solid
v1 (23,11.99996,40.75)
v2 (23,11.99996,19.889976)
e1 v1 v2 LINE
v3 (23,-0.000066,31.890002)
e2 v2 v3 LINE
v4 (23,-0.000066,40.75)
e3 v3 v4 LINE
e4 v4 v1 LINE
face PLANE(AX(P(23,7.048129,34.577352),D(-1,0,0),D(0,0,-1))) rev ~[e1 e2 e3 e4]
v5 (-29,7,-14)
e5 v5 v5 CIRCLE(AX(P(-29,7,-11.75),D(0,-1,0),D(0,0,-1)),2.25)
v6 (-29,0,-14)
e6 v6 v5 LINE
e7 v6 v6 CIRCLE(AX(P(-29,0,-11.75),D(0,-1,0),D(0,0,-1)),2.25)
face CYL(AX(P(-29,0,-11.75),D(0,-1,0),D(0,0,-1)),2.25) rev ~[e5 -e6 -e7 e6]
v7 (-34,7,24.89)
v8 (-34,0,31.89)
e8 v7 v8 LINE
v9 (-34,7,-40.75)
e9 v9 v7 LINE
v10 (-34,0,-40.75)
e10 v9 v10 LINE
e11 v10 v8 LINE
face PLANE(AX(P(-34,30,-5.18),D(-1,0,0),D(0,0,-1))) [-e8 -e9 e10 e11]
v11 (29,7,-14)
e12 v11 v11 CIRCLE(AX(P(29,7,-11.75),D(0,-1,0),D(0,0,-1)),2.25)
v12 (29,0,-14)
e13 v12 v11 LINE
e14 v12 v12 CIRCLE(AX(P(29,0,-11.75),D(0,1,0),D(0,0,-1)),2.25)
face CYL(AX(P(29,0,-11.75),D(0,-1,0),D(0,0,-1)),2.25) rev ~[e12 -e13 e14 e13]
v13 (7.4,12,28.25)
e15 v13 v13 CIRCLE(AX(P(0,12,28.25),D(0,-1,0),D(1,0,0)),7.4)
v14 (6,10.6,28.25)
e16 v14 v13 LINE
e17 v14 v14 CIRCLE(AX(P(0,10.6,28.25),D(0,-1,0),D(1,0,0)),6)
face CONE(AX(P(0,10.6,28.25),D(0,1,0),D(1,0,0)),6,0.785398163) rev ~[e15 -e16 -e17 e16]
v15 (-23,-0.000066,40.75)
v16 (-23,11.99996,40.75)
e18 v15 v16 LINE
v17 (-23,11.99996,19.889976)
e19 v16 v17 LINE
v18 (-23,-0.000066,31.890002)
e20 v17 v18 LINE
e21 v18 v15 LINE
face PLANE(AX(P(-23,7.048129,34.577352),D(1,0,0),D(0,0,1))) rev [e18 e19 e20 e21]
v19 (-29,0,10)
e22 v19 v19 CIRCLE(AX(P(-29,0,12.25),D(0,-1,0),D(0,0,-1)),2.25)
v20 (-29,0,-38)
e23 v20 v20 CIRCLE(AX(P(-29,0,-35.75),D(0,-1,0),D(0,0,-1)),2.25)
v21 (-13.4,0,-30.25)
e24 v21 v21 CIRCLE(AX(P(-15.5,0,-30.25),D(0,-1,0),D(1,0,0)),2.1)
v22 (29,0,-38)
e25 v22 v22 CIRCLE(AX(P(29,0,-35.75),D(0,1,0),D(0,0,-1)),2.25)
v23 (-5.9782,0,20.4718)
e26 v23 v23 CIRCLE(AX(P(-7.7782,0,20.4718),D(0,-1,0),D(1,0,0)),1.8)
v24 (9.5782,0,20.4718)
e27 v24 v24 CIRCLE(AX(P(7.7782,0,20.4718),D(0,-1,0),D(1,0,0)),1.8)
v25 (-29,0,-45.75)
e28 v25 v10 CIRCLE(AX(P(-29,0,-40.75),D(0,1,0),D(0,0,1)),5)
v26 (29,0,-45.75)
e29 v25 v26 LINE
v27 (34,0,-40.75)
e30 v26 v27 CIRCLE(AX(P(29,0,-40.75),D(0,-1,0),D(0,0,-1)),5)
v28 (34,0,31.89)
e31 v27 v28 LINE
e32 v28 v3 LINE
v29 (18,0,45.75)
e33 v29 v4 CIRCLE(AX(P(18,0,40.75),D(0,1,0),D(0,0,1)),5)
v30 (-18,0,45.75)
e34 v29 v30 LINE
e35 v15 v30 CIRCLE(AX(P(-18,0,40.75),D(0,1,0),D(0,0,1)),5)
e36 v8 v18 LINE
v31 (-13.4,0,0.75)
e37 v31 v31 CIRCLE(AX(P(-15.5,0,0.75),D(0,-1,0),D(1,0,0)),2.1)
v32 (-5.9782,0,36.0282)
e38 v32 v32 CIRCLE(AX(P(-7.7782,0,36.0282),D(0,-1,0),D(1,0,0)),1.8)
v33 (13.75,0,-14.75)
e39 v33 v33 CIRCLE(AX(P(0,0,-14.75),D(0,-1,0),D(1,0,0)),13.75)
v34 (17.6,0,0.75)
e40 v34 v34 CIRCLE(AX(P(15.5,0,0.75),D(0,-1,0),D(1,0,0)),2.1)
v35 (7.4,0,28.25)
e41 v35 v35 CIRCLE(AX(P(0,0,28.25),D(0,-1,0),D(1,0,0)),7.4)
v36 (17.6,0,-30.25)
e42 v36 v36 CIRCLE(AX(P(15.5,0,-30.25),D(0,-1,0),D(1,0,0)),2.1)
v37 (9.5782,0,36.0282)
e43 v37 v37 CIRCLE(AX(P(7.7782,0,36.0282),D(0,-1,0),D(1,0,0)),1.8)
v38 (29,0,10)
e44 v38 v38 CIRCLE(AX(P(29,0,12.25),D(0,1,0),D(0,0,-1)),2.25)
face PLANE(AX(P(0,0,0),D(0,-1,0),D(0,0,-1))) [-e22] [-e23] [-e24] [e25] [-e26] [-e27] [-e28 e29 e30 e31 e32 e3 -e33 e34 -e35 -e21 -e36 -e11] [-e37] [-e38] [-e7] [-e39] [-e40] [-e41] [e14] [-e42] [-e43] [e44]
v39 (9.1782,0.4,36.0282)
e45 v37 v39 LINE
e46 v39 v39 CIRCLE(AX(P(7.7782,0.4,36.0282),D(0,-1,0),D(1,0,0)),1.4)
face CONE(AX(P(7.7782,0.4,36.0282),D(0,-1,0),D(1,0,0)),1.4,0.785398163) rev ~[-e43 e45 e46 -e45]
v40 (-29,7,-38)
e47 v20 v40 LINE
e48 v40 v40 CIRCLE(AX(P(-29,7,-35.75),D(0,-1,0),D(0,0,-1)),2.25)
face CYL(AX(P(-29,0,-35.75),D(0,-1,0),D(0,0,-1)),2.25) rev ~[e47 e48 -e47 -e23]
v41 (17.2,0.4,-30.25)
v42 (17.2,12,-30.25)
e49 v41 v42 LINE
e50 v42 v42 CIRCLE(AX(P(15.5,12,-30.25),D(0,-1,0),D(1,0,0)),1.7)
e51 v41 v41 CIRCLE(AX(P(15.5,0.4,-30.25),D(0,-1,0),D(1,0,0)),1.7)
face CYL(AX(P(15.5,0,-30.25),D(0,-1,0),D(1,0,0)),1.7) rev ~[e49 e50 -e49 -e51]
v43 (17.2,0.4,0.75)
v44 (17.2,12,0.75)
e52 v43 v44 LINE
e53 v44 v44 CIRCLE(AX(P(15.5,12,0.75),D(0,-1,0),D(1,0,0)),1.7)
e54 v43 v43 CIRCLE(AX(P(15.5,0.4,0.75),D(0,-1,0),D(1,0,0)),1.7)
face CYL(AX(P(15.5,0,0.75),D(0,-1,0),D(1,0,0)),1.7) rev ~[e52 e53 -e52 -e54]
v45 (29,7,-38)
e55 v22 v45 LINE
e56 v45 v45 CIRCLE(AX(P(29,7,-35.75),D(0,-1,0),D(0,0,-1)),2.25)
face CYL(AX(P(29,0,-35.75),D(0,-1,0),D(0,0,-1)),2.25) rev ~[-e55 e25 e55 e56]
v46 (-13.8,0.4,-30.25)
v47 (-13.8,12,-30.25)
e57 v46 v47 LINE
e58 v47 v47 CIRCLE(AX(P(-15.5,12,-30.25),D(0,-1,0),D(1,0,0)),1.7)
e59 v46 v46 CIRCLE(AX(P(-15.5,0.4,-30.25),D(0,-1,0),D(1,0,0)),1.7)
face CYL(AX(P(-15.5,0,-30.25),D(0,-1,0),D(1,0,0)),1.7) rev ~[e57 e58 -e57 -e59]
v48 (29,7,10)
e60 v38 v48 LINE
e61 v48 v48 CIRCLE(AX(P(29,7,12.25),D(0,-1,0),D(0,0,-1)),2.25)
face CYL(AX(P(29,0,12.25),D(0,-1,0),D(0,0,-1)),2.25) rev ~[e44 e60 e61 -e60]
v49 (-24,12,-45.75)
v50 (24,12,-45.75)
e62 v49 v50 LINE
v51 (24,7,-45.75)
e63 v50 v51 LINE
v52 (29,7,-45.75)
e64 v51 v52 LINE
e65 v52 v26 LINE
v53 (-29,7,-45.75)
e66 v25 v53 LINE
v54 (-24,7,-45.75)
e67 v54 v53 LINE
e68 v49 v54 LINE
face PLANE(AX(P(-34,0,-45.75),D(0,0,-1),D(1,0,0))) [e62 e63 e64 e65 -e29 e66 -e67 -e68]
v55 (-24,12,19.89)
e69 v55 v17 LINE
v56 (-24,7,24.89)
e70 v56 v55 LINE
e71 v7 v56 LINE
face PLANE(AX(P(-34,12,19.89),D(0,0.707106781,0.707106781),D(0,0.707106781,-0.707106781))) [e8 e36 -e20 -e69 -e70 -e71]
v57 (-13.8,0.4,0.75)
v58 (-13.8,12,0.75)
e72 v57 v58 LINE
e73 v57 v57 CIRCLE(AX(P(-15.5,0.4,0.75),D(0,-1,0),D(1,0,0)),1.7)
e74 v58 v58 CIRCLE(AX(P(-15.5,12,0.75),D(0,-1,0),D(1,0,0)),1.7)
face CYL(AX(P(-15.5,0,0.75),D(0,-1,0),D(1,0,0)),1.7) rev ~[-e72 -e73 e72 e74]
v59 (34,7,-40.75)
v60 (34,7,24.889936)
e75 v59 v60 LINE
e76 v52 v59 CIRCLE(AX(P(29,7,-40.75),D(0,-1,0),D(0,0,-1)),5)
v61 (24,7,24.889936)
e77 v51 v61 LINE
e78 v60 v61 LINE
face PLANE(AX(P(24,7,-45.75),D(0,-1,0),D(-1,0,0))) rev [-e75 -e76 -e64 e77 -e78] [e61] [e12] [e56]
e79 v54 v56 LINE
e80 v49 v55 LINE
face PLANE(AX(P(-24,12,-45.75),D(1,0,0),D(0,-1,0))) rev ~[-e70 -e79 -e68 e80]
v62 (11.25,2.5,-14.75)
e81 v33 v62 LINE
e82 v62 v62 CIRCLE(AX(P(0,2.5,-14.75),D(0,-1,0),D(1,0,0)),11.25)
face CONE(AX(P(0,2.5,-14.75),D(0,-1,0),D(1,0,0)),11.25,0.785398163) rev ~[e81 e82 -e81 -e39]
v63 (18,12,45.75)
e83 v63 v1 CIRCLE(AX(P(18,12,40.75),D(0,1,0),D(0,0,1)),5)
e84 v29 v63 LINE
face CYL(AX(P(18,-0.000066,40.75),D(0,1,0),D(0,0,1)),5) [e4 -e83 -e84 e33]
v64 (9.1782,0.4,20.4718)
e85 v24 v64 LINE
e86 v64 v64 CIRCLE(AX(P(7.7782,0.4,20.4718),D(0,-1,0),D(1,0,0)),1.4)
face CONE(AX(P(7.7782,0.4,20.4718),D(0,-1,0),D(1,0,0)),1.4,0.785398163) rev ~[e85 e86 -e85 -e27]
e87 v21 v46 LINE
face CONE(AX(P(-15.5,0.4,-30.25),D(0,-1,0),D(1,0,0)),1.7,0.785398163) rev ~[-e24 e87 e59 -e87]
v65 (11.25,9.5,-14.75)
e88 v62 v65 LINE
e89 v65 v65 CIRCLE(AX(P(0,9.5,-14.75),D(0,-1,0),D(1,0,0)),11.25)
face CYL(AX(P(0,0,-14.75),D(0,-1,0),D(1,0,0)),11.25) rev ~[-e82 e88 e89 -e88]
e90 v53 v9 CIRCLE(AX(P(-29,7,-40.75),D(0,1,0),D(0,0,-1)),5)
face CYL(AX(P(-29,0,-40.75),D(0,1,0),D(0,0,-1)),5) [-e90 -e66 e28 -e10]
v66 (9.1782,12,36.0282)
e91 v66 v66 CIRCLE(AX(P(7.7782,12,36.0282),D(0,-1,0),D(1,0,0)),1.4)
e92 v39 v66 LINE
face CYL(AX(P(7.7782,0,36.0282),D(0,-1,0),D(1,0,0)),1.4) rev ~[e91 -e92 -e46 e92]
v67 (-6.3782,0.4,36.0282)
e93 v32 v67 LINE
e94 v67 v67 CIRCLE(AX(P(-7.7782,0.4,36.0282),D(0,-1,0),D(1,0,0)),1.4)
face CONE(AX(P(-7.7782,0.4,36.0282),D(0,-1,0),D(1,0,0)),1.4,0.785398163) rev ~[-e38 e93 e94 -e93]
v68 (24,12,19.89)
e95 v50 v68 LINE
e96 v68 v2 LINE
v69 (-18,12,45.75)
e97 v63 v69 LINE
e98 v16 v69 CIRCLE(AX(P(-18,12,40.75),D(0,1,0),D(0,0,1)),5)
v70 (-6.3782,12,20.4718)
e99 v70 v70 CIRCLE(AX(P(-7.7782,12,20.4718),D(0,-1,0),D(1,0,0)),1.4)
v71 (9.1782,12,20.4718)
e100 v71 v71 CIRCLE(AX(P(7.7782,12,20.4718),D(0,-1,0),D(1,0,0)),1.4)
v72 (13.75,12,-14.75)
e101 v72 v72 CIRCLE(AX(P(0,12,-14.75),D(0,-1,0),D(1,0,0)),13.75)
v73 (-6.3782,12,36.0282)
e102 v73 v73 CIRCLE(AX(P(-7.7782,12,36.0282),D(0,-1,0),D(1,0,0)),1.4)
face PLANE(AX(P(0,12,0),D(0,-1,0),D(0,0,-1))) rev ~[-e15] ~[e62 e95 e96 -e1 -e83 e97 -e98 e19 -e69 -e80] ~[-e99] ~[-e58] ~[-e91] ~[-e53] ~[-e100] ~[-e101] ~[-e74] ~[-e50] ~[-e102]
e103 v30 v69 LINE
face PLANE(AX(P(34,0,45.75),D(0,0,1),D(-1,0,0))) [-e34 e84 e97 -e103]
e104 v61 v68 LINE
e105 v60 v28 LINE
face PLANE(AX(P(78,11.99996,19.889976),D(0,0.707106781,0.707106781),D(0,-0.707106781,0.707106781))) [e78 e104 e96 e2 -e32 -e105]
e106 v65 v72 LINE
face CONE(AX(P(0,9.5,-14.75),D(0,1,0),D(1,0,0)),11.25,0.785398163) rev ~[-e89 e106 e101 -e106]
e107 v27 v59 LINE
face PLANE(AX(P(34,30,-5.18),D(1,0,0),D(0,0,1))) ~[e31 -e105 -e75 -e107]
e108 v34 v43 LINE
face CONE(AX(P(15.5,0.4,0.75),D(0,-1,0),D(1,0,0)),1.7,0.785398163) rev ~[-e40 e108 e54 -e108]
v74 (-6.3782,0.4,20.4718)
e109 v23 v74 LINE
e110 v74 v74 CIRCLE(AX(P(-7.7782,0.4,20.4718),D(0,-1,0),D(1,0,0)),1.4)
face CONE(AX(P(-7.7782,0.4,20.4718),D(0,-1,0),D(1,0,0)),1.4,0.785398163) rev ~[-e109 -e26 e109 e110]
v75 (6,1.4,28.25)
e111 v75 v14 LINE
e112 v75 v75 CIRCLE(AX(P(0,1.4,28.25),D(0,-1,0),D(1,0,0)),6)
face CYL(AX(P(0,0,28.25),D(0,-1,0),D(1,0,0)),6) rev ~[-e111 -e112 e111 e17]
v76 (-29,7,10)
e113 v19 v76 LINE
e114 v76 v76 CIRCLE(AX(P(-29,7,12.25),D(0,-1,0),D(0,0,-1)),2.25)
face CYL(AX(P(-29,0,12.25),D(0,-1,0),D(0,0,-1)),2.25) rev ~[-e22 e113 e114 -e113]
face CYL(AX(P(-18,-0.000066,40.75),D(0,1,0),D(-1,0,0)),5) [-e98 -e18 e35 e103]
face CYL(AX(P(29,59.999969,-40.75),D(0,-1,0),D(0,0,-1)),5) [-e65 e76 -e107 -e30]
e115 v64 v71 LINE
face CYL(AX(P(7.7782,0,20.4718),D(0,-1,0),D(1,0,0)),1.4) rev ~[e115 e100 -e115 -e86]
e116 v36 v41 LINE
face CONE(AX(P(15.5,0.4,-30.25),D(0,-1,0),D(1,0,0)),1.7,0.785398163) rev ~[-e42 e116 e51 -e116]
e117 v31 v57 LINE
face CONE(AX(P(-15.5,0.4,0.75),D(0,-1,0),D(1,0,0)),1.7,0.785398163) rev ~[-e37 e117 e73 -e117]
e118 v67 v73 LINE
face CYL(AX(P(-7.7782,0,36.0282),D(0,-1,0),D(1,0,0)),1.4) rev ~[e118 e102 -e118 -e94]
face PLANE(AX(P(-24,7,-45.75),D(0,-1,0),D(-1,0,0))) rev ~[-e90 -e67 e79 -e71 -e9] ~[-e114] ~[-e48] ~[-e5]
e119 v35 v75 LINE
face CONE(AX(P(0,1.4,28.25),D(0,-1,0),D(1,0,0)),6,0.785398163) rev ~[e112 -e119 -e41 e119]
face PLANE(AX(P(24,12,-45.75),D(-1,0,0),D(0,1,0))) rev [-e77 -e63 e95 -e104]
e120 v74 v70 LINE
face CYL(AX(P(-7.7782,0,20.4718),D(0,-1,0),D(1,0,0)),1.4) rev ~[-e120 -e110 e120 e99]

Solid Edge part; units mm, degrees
sketch "Sketch1" plane through (0, 0, 0) normal (0, -1, 0) x (1, 0, 0)
  line L0 (-34, -45.75) -> (34, -45.75)
  line L1 (34, -45.75) -> (34, 45.75)
  line L2 (34, 45.75) -> (-34, 45.75)
  line L3 (-34, 45.75) -> (-34, -45.75)
  dimension "D1" = 68
  dimension "D2" = 91.5
extrude "Protrusion1" add sketch "Sketch1" against normal blind 12
sketch "Sketch2" plane through (0, 0, 0) normal (0, -1, 0) x (1, 0, 0)
  circle A0 centre (0, -14.75) radius 11.25
  circle A1 centre (-15.5, 0.75) radius 1.7
  circle A2 centre (-15.5, -30.25) radius 1.7
  circle A3 centre (15.5, -30.25) radius 1.7
  circle A4 centre (15.5, 0.75) radius 1.7
  dimension "D1" = 22.5
  dimension "D2" = 3.4
  dimension "D3" = 31
  dimension "D4" = 31
extrude "Cutout1" cut sketch "Sketch2" against normal through all
sketch "Sketch3" plane through (0, 0, 0) normal (0, -1, 0) x (1, 0, 0)
  circle A0 centre (7.7782, 36.0282) radius 1.4
  circle A1 centre (7.7782, 20.4718) radius 1.4
  circle A2 centre (-7.7782, 20.4718) radius 1.4
  circle A3 centre (-7.7782, 36.0282) radius 1.4
  circle A4 centre (0, 28.25) radius 6
  dimension "D1" = 7.7782
extrude "Cutout2" cut sketch "Sketch3" against normal through all
sketch "Sketch4" plane through (-34, 6, 0) normal (-1, 0, 0) x (0, 0, -1)
  line L0 (-19.89, -6) -> (45.75, -71.64)
  line L1 (45.75, -71.64) -> (45.75, -6)
  line L2 (45.75, -6) -> (-19.89, -6)
  dimension "D1" = 25.86
extrude "Extrusionsausprägung_2" add sketch "Sketch4" against normal blind 10
mirror "Mirror1" about plane through (0, 0, 0) normal (1, 0, 0) of "Extrusionsausprägung_2"
sketch "Sketch5" plane through (-34, 38.82, 0) normal (-1, 0, 0) x (0, 0, -1)
  circle A0 centre (33.7465, 1.4635) radius 1.875
  circle A1 centre (19.6043, 15.6057) radius 1.875
  dimension "D1" = 3.75
  dimension "D2" = 20
  dimension "D3" = 42.14
  dimension "D4" = 32.83
extrude "Extrusionsausschnitt_3" cut sketch "Sketch5" against normal blind 14
sketch "Sketch6" plane through (-34, 38.82, 0) normal (-1, 0, 0) x (0, 0, -1)
  line L0 (45.75, -38.82) -> (-31.89, 38.82)
  line L1 (-31.89, 38.82) -> (-17.75, 38.82)
  line L2 (-17.75, 38.82) -> (45.75, -24.68)
  line L3 (45.75, -24.68) -> (45.75, -38.82)
  dimension "D1" = 14.14
extrude "Extrusionsausprägung_4" add sketch "Sketch6" along normal blind 44
mirror "Mirror2" about plane through (0, 0, 0) normal (1, 0, 0) of "Extrusionsausprägung_4"
sketch "Sketch7" plane through (-54, 31.75, -14) normal (0, -0.7071068, -0.7071068) x (1, 0, 0)
  circle A0 centre (-14, 10.2613) radius 4
  circle A1 centre (-14, -19.7387) radius 4
  dimension "D1" = 8
  dimension "D2" = 34.64
  dimension "D3" = 30
  dimension "D4" = 10
extrude "Cutout3" cut sketch "Sketch7" against normal up to next
mirror "Mirror3" about plane through (0, 0, 0) normal (1, 0, 0) of "Cutout3"
sketch "Sketch8" plane through (-78, 38.82, -6.93) normal (-1, 0, 0) x (0, 0.7071068, -0.7071068)
  line L0 (29.953, 0) -> (42.4264, 12.4734)
  dimension "D1" = 60
extrude "Cutout4" cut sketch "Sketch8" against normal through all material side at (-78, 60.05, -36.93)
sketch "Sketch9" plane through (78, 30, -5.18) normal (1, 0, 0) x (0, -0.7071068, 0.7071068)
  line L0 (30.4551, -4.9992) -> (47.4257, -4.9992)
  line L1 (47.4257, -4.9992) -> (57.2262, -14.7997)
  line L2 (57.2262, -14.7997) -> (48.7409, -23.285)
  line L3 (48.7409, -23.285) -> (30.4551, -4.9992)
extrude "Extrusionsausschnitt_6" cut sketch "Sketch9" against normal blind 55
mirror "Mirror4" about plane through (0, 0, 0) normal (1, 0, 0) of "Extrusionsausschnitt_6"
fillet "Verrundung_1" radius 5 4 edges at (23, 6, 45.75) (-23, 6, 45.75) (34, 30, -45.75) (-34, 30, -45.75)
chamfer "Chamfer1" distance 0.5 angle 45 2 edges at (-34, 23.2143, -17.7293) (-34, 37.3565, -31.8715)
chamfer "Fase_2" distance 0.4 angle 45 4 edges at (-17.2, 0, -30.25) (-17.2, 0, 0.75) (13.8, 0, 0.75) (13.8, 0, -30.25)
chamfer "Fase_3" distance 0.4 angle 45 4 edges at (-9.1782, 0, 20.4718) (-9.1782, 0, 36.0282) (6.3782, 0, 36.0282) (6.3782, 0, 20.4718)
chamfer "Fase_4" distance 2.5 angle 45 2 edges at (-11.25, 0, -14.75) (0, 12, -3.5)
chamfer "Fase_5" distance 1.4 angle 45 2 edges at (-6, 0, 28.25) (0, 12, 34.25)
chamfer "Fase_7" distance 1 angle 45 4 edges at (-68, 34.3926, -2.5026) (-68, 55.6058, -23.7158) (68, 34.3926, -2.5026) (68, 55.6058, -23.7158)
sketch "Sketch10" plane through (-78, 30, -5.18) normal (-1, 0, 0) x (0, 0.7071068, -0.7071068)
  line L0 (-30.4551, -4.9992) -> (-20.4566, 4.9992)
extrude "Extrusionsausschnitt_8" cut sketch "Sketch10" against normal blind 44 material side at (-78, 11.95, 12.82)
mirror "Mirror5" about plane through (0, 0, 0) normal (1, 0, 0) of "Extrusionsausschnitt_8"
sketch "Sketch11" plane through (-78, 36, -11.18) normal (-1, 0, 0) x (0, 0.7071068, -0.7071068)
  line L0 (-38.9404, -4.9992) -> (7.4741, 41.4152)
extrude "Cutout6" cut sketch "Sketch11" against normal through all material side at (-78, 12.05, -12.93)
sketch "Sketch12" plane through (0, 0, 0) normal (0, -1, 0) x (0, 0, -1)
  circle A0 centre (35.75, -29) radius 2.25
  circle A1 centre (11.75, -29) radius 2.25
  circle A2 centre (-12.25, -29) radius 2.25
  dimension "D1" = 4.5
  dimension "D2" = 5
  dimension "D3" = 24
  dimension "D4" = 24
  dimension "D5" = 10
extrude "Cutout7" cut sketch "Sketch12" against normal through all
mirror "Mirror6" about plane through (0, 0, 0) normal (1, 0, 0) of "Cutout7"
sketch "Sketch13" plane through (0, 6, -45.75) normal (0, 0, -1) x (1, 0, 0)
  line L0 (-34, -6) -> (-24, -6)
  line L1 (-24, -6) -> (-24, -1)
  line L2 (-24, -1) -> (-34, -1)
  line L3 (-34, -1) -> (-34, -6)
  dimension "D1" = 10
  dimension "D2" = 5
extrude "Cutout8" cut sketch "Sketch13" against normal through all
mirror "Mirror7" about plane through (0, 0, 0) normal (1, 0, 0) of "Cutout8"
properties material "Nylon, allgemein"
